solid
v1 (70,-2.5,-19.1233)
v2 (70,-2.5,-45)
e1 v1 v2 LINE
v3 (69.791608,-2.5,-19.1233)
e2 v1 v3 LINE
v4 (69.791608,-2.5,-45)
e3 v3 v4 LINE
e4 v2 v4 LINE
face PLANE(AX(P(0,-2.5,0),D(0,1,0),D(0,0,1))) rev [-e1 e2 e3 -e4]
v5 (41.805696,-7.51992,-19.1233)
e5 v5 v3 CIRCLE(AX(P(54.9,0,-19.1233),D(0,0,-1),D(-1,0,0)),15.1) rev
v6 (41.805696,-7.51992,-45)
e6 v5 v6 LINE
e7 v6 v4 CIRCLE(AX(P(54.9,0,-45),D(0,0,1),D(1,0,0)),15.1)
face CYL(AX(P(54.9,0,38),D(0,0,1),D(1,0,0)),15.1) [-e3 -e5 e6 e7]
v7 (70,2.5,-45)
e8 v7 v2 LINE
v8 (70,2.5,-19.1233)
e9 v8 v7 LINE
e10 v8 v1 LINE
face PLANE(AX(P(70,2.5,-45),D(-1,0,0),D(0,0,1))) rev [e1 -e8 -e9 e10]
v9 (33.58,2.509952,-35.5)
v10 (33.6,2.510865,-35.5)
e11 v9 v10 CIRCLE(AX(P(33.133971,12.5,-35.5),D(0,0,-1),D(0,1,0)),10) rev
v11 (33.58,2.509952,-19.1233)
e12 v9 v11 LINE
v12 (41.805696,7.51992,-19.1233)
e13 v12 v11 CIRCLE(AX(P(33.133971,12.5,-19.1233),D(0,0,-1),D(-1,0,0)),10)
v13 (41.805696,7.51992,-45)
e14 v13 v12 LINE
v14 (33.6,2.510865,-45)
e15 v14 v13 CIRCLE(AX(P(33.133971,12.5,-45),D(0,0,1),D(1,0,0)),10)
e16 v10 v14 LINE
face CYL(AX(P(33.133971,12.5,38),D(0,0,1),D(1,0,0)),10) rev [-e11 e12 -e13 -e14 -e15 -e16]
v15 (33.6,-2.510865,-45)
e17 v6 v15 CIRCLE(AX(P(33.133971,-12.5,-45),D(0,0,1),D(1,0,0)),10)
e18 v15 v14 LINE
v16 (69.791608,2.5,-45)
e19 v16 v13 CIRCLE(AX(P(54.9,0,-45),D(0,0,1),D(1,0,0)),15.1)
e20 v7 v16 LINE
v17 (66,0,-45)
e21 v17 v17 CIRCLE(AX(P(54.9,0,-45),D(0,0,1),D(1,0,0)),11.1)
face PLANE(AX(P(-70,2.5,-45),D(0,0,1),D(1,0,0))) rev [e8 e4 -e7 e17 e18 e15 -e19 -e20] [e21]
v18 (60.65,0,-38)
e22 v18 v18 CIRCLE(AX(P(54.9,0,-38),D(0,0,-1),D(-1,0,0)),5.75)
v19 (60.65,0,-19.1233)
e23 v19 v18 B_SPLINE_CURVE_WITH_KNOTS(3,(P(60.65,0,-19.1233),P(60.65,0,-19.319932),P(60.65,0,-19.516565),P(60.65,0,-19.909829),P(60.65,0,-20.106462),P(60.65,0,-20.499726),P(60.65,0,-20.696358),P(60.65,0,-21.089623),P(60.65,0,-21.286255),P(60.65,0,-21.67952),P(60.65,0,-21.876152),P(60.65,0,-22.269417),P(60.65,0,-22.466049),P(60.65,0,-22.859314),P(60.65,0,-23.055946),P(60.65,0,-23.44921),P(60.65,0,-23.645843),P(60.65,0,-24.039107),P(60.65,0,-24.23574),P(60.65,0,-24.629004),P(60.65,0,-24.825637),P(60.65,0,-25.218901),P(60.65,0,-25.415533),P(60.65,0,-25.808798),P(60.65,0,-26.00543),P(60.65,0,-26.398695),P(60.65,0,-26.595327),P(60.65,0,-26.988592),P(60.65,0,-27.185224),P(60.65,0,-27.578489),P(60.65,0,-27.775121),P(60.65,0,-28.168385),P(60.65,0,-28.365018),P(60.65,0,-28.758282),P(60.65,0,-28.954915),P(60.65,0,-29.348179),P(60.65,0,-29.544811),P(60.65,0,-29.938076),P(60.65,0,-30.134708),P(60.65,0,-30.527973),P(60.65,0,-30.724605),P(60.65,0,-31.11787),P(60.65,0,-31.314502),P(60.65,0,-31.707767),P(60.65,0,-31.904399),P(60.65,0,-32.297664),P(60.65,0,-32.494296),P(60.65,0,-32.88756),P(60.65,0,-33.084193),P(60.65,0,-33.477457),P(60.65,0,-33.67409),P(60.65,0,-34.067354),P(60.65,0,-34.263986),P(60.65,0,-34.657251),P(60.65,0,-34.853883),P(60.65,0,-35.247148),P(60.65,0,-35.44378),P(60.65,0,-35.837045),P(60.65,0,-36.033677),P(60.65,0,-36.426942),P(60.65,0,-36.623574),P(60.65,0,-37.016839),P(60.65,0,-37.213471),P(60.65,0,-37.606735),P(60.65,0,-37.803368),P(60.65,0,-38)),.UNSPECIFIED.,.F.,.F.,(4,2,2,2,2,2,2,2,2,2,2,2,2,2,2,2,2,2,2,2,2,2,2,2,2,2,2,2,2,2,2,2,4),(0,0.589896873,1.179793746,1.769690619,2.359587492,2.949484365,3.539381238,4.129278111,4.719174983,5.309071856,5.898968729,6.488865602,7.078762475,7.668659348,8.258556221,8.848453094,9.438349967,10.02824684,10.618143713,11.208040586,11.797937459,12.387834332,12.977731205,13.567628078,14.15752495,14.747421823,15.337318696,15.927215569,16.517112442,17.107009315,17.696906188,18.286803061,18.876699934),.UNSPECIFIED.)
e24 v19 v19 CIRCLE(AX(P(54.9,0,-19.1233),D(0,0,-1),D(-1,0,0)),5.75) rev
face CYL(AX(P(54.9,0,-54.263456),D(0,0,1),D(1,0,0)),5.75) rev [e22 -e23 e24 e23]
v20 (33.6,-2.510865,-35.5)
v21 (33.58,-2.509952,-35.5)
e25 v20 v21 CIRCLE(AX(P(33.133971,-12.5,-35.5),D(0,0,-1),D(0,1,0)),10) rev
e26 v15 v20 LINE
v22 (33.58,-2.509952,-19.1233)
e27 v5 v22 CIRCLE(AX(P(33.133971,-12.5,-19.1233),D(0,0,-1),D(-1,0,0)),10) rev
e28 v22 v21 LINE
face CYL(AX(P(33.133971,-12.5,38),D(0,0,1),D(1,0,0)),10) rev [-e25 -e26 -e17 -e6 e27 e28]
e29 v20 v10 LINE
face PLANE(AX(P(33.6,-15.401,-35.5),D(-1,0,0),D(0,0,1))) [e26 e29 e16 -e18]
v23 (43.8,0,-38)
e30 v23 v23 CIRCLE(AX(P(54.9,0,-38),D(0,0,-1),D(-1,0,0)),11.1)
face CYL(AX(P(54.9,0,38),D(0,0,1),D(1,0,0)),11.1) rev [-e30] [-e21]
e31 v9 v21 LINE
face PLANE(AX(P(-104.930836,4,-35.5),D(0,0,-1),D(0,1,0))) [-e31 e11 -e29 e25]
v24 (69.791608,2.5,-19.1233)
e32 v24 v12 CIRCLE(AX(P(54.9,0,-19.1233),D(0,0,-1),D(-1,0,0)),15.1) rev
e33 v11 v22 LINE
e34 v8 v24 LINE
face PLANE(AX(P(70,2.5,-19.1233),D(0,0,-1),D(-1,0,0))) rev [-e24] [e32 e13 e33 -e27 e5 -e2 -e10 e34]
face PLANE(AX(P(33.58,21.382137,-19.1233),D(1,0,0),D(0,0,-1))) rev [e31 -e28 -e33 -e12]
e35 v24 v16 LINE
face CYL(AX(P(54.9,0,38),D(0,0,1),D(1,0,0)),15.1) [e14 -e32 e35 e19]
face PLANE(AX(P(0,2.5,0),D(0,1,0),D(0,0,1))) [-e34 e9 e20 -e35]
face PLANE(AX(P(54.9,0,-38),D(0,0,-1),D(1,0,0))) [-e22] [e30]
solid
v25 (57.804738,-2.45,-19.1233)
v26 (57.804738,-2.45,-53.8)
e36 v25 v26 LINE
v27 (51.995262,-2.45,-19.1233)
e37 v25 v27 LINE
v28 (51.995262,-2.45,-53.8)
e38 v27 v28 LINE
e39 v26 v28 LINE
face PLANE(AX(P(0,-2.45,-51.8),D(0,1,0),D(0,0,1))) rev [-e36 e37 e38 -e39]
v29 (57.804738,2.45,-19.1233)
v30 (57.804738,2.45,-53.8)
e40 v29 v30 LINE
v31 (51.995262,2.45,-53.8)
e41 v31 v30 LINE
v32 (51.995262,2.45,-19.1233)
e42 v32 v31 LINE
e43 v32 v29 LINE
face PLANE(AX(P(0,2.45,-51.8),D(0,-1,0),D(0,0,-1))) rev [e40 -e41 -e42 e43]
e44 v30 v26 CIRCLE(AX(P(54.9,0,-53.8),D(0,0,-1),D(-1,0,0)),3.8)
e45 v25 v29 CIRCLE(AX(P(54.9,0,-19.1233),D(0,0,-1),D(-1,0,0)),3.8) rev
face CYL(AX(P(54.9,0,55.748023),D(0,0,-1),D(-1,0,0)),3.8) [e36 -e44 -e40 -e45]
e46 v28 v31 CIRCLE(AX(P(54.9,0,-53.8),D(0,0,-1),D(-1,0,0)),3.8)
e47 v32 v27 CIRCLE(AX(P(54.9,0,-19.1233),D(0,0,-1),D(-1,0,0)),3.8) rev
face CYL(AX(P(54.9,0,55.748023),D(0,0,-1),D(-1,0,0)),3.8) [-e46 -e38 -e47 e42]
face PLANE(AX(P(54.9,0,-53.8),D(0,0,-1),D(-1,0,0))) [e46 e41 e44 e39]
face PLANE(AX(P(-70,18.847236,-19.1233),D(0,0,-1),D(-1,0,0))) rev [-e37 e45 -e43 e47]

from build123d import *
from build123d.topology import SkipClean

# Parameters (mm, degrees)
SKETCH1_W                = 140
SKETCH1_H                = 90
BOSS_EXTRUDE1_DEPTH      = 2.5
SKETCH2_W                = 27.1
SKETCH2_H                = 30.8
SKETCH2_W_2              = 19.1
SKETCH2_H_2              = 22.8
BOSS_EXTRUDE2_DEPTH      = 40.6
SKETCH3_W                = 19.1
SKETCH3_H                = 22.8
BOSS_EXTRUDE3_DEPTH      = 4
CUT_EXTRUDE1_REACH       = 158.444
SKETCH4_W                = 5
SKETCH4_H                = 8
FILLET1_R                = 25
SKETCH5_W                = 38.1
SKETCH5_H                = 8
CUT_EXTRUDE2_DEPTH       = 39.6
CUT_EXTRUDE3_REACH       = 101.288
SKETCH6_W                = 55
SKETCH6_H                = 9.5
CUT_EXTRUDE4_REACH       = 135.898
SKETCH9_R                = 15.1
SKETCH9_R_2              = 11.1
BOSS_EXTRUDE4_DEPTH      = 7
SKETCH10_R               = 11.1
CUT_EXTRUDE5_DEPTH       = 7
SKETCH11_R               = 5.75
CUT_EXTRUDE6_DEPTH       = 76
BOSS_EXTRUDE5_DEPTH      = 76
SKETCH13_R               = 11.1
SKETCH13_R_2             = 5.75
BOSS_EXTRUDE6_DEPTH      = 76
SKETCH14_W               = 38.246600132
SKETCH14_H               = 12.6
CUT_EXTRUDE7_DEPTH       = 157.444143387
SKETCH15_R               = 3.8
BOSS_EXTRUDE7_DEPTH      = 90
SKETCH16_R               = 3.8
BOSS_EXTRUDE8_DEPTH      = 0.8
BOSS_EXTRUDE9_DEPTH      = 6
FILLET2_R                = 2
CHAMFER1_SIZE            = 1.6
FILLET3_R                = 10
FILLET4_R                = 5
CUT_EXTRUDE9_DEPTH       = 135.574774806
CUT_EXTRUDE10_DEPTH      = 157.444143476
CUT_EXTRUDE10_DEPTH_BACK = 157.444143476
SKETCH20_W               = 91.164780252
SKETCH20_H               = 36.856817744
CUT_EXTRUDE11_DEPTH      = 79.739570827
CUT_EXTRUDE11_DEPTH_BACK = 79.739570827
SKETCH21_W               = 114.516410758
SKETCH21_H               = 52.09205151
CUT_EXTRUDE12_DEPTH      = 6
BOSS_EXTRUDE10_DEPTH     = 8


# Read off the part's stored shape, not the designer's step: Mirror1
with BuildPart() as part:
    # Sketch1 → Boss-Extrude1 (new, symmetric)
    with BuildSketch(Plane(origin=(0, 0, 0), x_dir=(1, 0, 0), z_dir=(0, 1, 0))):
        Rectangle(SKETCH1_W, SKETCH1_H)
    extrude(amount=BOSS_EXTRUDE1_DEPTH, both=True)

    # Sketch2 → Boss-Extrude2 (add)
    with BuildSketch(Plane.ZY.offset(70)):
        with Locations((54.55, 0)):
            Rectangle(SKETCH2_W, SKETCH2_H)
        with Locations((54.55, 0)):
            Rectangle(SKETCH2_W_2, SKETCH2_H_2, mode=Mode.SUBTRACT)
    extrude(amount=-BOSS_EXTRUDE2_DEPTH)

    # Sketch3 → Boss-Extrude3 (add)
    with BuildSketch(Plane.ZY.offset(70)):
        with Locations((54.55, 0)):
            Rectangle(SKETCH3_W, SKETCH3_H)
    extrude(amount=-BOSS_EXTRUDE3_DEPTH)

    # Sketch4 → Cut-Extrude1 (cut, up to next)
    with BuildSketch(Plane.ZY.offset(70), mode=Mode.PRIVATE) as cut_extrude1_sk1:
        with Locations((54.55, 0)):
            Rectangle(SKETCH4_W, SKETCH4_H)
    cut_extrude1_tool1 = extrude(cut_extrude1_sk1.sketch, amount=-CUT_EXTRUDE1_REACH, mode=Mode.PRIVATE) & part.part
    add(cut_extrude1_tool1.solids().sort_by_distance((-70, 0, 54.55))[0], mode=Mode.SUBTRACT)

    # Fillet1
    # the kernel refuses this fillet: 25 mm, written as the material it adds along each edge
    with BuildSketch(Plane(origin=(-70, -2.5, 41), x_dir=(0, 0, -1), z_dir=(1, 0, 0))) as fillet1_piece_1:
        with BuildLine():
            CenterArc((21.876699934, -25), FILLET1_R, 90, 61.053024114)
            Line((0, -12.9), (-0.437533999, -12.658))
            ThreePointArc((-0.437533999, -12.658), (-0.5, -6.45), (-0.5, 0))
            Line((-0.5, 0), (0, 0.5))
            Line((0, 0.5), (21.876699934, 0.5))
            Line((21.876699934, 0.5), (21.876699934, 0))
        make_face()
    extrude(amount=40.6)
    with BuildSketch(Plane(origin=(-70, 2.5, 41), x_dir=(0, 0, -1), z_dir=(1, 0, 0))) as fillet1_piece_2:
        with BuildLine():
            CenterArc((21.876699934, 25), FILLET1_R, 208.946975886, 61.053024114)
            Line((0, 12.9), (-0.437533999, 12.658))
            ThreePointArc((-0.437533999, 12.658), (-0.5, 6.45), (-0.5, 0))
            Line((-0.5, 0), (0, -0.5))
            Line((0, -0.5), (21.876699934, -0.5))
            Line((21.876699934, -0.5), (21.876699934, 0))
        make_face()
    extrude(amount=40.6)

    # Sketch5 → Cut-Extrude2 (cut)
    with BuildSketch(Plane(origin=(-21.4, 0, 0), x_dir=(0, 0, -1), z_dir=(1, 0, 0))):
        with Locations((-54.55, 0)):
            Rectangle(SKETCH5_W, SKETCH5_H)
    extrude(amount=-CUT_EXTRUDE2_DEPTH, mode=Mode.SUBTRACT)

    # Sketch6 → Cut-Extrude3 (cut, up to next)
    with BuildSketch(Plane(origin=(0, 2.5, 0), x_dir=(1, 0, 0), z_dir=(0, 1, 0)), mode=Mode.PRIVATE) as cut_extrude3_sk1:
        with Locations((6.1, -40.25)):
            Rectangle(SKETCH6_W, SKETCH6_H)
    cut_extrude3_tool1 = extrude(cut_extrude3_sk1.sketch, amount=-CUT_EXTRUDE3_REACH, mode=Mode.PRIVATE) & part.part
    add(cut_extrude3_tool1.solids().sort_by_distance((6.1, 2.5, 40.25))[0], mode=Mode.SUBTRACT)

    # Sketch8 → Cut-Extrude4 (cut, up to next)
    with BuildSketch(Plane.XY.offset(68.1), mode=Mode.PRIVATE) as cut_extrude4_sk1:
        with BuildLine():
            Line((-58.5, 7.5), (-28.5, 7.5))
            ThreePointArc((-28.5, 7.5), (-21, 0), (-28.5, -7.5))
            Line((-28.5, -7.5), (-58.5, -7.5))
            ThreePointArc((-58.5, -7.5), (-66, 0), (-58.5, 7.5))
        make_face()
    cut_extrude4_tool1 = extrude(cut_extrude4_sk1.sketch, amount=-CUT_EXTRUDE4_REACH, mode=Mode.PRIVATE) & part.part
    add(cut_extrude4_tool1.solids().sort_by_distance((-43.5, 0, 68.1))[0], mode=Mode.SUBTRACT)

    # Mirror1
    split(bisect_by=Plane.XY, keep=Keep.TOP)

    # Mirror1 2: part across plane


with BuildPart() as part_1:
    add(part.part)
    add(part.part.mirror(Plane.XY))

    # Sketch9 → Boss-Extrude4 (add)
    with BuildSketch(Plane.XY.offset(45)):
        with Locations((54.9, 0)):
            Circle(SKETCH9_R)
        with Locations((54.9, 0)):
            Circle(SKETCH9_R_2, mode=Mode.SUBTRACT)
    boss_extrude4 = extrude(amount=-BOSS_EXTRUDE4_DEPTH)

    # Sketch10 → Cut-Extrude5 (cut)
    with BuildSketch(Plane.XY.offset(45)):
        with Locations((54.9, 0)):
            Circle(SKETCH10_R)
    cut_extrude5 = extrude(amount=-CUT_EXTRUDE5_DEPTH, mode=Mode.SUBTRACT)

    # Mirror2: Boss-Extrude4, Cut-Extrude5 across plane
    add(boss_extrude4.mirror(Plane.XY))
    add(cut_extrude5.mirror(Plane.XY), mode=Mode.SUBTRACT)

    # Sketch11 → Cut-Extrude6 (cut)
    with BuildSketch(Plane.XY.offset(38)):
        with Locations((54.9, 0)):
            Circle(SKETCH11_R)
    extrude(amount=-CUT_EXTRUDE6_DEPTH, mode=Mode.SUBTRACT)

    # Sketch12 → Boss-Extrude5 (add)
    with BuildSketch(Plane(origin=(0, 0, 38), x_dir=(-1, 0, 0), z_dir=(0, 0, -1))):
        with BuildLine():
            Line((-44.085195332, 2.5), (-40.008391625, 2.5))
            ThreePointArc((-40.008391625, 2.5), (-54.9, 15.1), (-69.791608375, 2.5))
            Line((-69.791608375, 2.5), (-65.714804668, 2.5))
            ThreePointArc((-65.714804668, 2.5), (-54.9, 11.1), (-44.085195332, 2.5))
        make_face()
        with BuildLine():
            Line((-40.008391625, -2.5), (-44.085195332, -2.5))
            ThreePointArc((-44.085195332, -2.5), (-54.9, -11.1), (-65.714804668, -2.5))
            Line((-65.714804668, -2.5), (-69.791608375, -2.5))
            ThreePointArc((-69.791608375, -2.5), (-54.9, -15.1), (-40.008391625, -2.5))
        make_face()
    extrude(amount=BOSS_EXTRUDE5_DEPTH)

    # Sketch13 → Boss-Extrude6 (add)
    with BuildSketch(Plane.XY.offset(38)):
        with Locations((54.9, 0)):
            Circle(SKETCH13_R)
        with Locations((54.9, 0)):
            Circle(SKETCH13_R_2, mode=Mode.SUBTRACT)
    extrude(amount=-BOSS_EXTRUDE6_DEPTH)

    # Sketch14 → Cut-Extrude7 (cut, through all)
    with BuildSketch(Plane.ZY.offset(70)):
        with Locations((0, 8.8)):
            Rectangle(SKETCH14_W, SKETCH14_H)
    extrude(amount=-CUT_EXTRUDE7_DEPTH, mode=Mode.SUBTRACT)

    # Fillet2
    fillet2_edges = [part_1.edges().sort_by_distance(p)[0] for p in [
        (-49.7, 15.4, -68.1),
        (-49.7, 15.4, -41),
        (-49.7, -15.4, -41),
        (-49.7, -15.4, -68.1),
        (-49.7, -15.4, 41),
        (-49.7, 15.4, 41),
        (-49.7, 15.4, 68.1),
        (-49.7, -15.4, 68.1),
    ]]
    fillet(fillet2_edges, radius=FILLET2_R)

    # Chamfer1
    chamfer1_edges = [part_1.edges().sort_by_distance(p)[0] for p in [
        (-43.95, 7.5, 68.1),
        (-66, 0, 68.1),
        (-43.95, -7.5, 68.1),
        (-43.95, 7.5, -68.1),
        (-43.95, -7.5, -68.1),
        (-66, 0, -68.1),
    ]]
    chamfer(chamfer1_edges, length=CHAMFER1_SIZE)

    # Fillet3
    # the kernel refuses this fillet: 10 mm, written as the material it adds along each edge
    with BuildSketch(Plane(origin=(40.008391625, -2.5, 38), x_dir=(0.3370807355447674, -0.9414757446289301, 0), z_dir=(0, 0, -1))) as fillet3_piece_1_section:
        with BuildLine():
            CenterArc((7.097522828, 9.842907234), FILLET3_R, 199.699116173, 60.131704489)
            Line((-2.317234618, 6.472099878), (0, 0))
            ThreePointArc((0, 0), (2.665984943, 0.237210077), (5.331969886, 0))
        make_face()
    fillet3_piece_1 = extrude(amount=76, mode=Mode.PRIVATE)
    fillet3_piece_1 = split(fillet3_piece_1, bisect_by=Plane(origin=(33.6, -3.612944969, 36.75), z_dir=(1, 0, 0)), keep=Keep.TOP, mode=Mode.PRIVATE)
    add(fillet3_piece_1)
    with BuildSketch(Plane(origin=(40.008391625, -2.5, 38), x_dir=(0.3370807355447674, -0.9414757446289301, 0), z_dir=(0, 0, -1))) as fillet3_piece_2_section:
        with BuildLine():
            CenterArc((7.097522828, 9.842907234), FILLET3_R, 199.699116173, 60.131704489)
            Line((-2.317234618, 6.472099878), (0, 0))
            ThreePointArc((0, 0), (2.665984943, 0.237210077), (5.331969886, 0))
        make_face()
    fillet3_piece_2 = extrude(amount=76, mode=Mode.PRIVATE)
    fillet3_piece_2 = split(fillet3_piece_2, bisect_by=Plane(origin=(33.483505518, -2.503259206, 35.5), z_dir=(0, 0, -1)), keep=Keep.TOP, mode=Mode.PRIVATE)
    fillet3_piece_2 = split(fillet3_piece_2, bisect_by=Plane(origin=(33.483505518, -2.503259206, -35.5), z_dir=(0, 0, 1)), keep=Keep.TOP, mode=Mode.PRIVATE)
    add(fillet3_piece_2)
    with BuildSketch(Plane(origin=(40.008391625, 2.5, -19.123300066), x_dir=(0.3370807355447668, 0.9414757446289305, 0), z_dir=(0, 0, -1))) as fillet3_piece_3_section:
        with BuildLine():
            CenterArc((7.097522828, -9.842907234), FILLET3_R, 100.169179339, 60.131704489)
            Line((-2.317234618, -6.472099878), (0, 0))
            ThreePointArc((0, 0), (2.665984943, -0.237210077), (5.331969886, 0))
        make_face()
    fillet3_piece_3 = extrude(amount=43.062750438, mode=Mode.PRIVATE)
    fillet3_piece_3 = split(fillet3_piece_3, bisect_by=Plane(origin=(38.74616156, 3.612944969, -35.5), z_dir=(0, 0, 1)), keep=Keep.TOP, mode=Mode.PRIVATE)
    add(fillet3_piece_3)
    with BuildSketch(Plane(origin=(40.008391625, 2.5, -19.123300066), x_dir=(0.3370807355447668, 0.9414757446289305, 0), z_dir=(0, 0, -1))) as fillet3_piece_4_section:
        with BuildLine():
            CenterArc((7.097522828, -9.842907234), FILLET3_R, 100.169179339, 60.131704489)
            Line((-2.317234618, -6.472099878), (0, 0))
            ThreePointArc((0, 0), (2.665984943, -0.237210077), (5.331969886, 0))
        make_face()
    fillet3_piece_4 = extrude(amount=25.876699934, mode=Mode.PRIVATE)
    fillet3_piece_4 = split(fillet3_piece_4, bisect_by=Plane(origin=(33.6, 3.612944969, -40.25), z_dir=(1, 0, 0)), keep=Keep.TOP, mode=Mode.PRIVATE)
    add(fillet3_piece_4)
    with BuildSketch(Plane(origin=(40.008391625, 2.5, 45), x_dir=(0.3370807355447668, 0.9414757446289305, 0), z_dir=(0, 0, -1))) as fillet3_piece_5_section:
        with BuildLine():
            CenterArc((7.097522828, -9.842907234), FILLET3_R, 100.169179339, 60.131704489)
            Line((-2.317234618, -6.472099878), (0, 0))
            ThreePointArc((0, 0), (2.665984943, -0.237210077), (5.331969886, 0))
        make_face()
    fillet3_piece_5 = extrude(amount=25.876699934, mode=Mode.PRIVATE)
    fillet3_piece_5 = split(fillet3_piece_5, bisect_by=Plane(origin=(33.6, 3.612944969, 40.25), z_dir=(1, 0, 0)), keep=Keep.TOP, mode=Mode.PRIVATE)
    add(fillet3_piece_5)
    with BuildSketch(Plane(origin=(40.008391625, 2.5, 62.186050504), x_dir=(0.3370807355447676, 0.9414757446289301, 0), z_dir=(0, 0, -1))) as fillet3_piece_6_section:
        with BuildLine():
            CenterArc((7.097522828, -9.842907234), FILLET3_R, 100.169179339, 60.131704489)
            Line((-2.317234618, -6.472099878), (0, 0))
            ThreePointArc((0, 0), (2.665984943, -0.237210077), (5.331969886, 0))
        make_face()
    fillet3_piece_6 = extrude(amount=43.062750438, mode=Mode.PRIVATE)
    fillet3_piece_6 = split(fillet3_piece_6, bisect_by=Plane(origin=(33.483505518, 2.503259206, 35.5), z_dir=(0, 0, -1)), keep=Keep.TOP, mode=Mode.PRIVATE)
    add(fillet3_piece_6)
    with BuildSketch(Plane(origin=(40.008391625, -2.5, 38), x_dir=(0.3370807355447675, -0.9414757446289301, 0), z_dir=(0, 0, 1))) as fillet3_piece_7_section:
        with BuildLine():
            CenterArc((7.097522828, -9.842907234), FILLET3_R, 100.169179339, 60.131704489)
            Line((-2.317234618, -6.472099878), (0, 0))
            ThreePointArc((0, 0), (2.665984943, -0.237210077), (5.331969886, 0))
        make_face()
    fillet3_piece_7 = extrude(amount=7, mode=Mode.PRIVATE)
    fillet3_piece_7 = split(fillet3_piece_7, bisect_by=Plane(origin=(33.6, -3.612944969, 41.5), z_dir=(1, 0, 0)), keep=Keep.TOP, mode=Mode.PRIVATE)
    add(fillet3_piece_7)
    with BuildSketch(Plane(origin=(40.008391625, -2.5, -38), x_dir=(0.3370807355447675, -0.9414757446289301, 0), z_dir=(0, 0, -1))) as fillet3_piece_8_section:
        with BuildLine():
            CenterArc((7.097522828, 9.842907234), FILLET3_R, 199.699116173, 60.131704489)
            Line((-2.317234618, 6.472099878), (0, 0))
            ThreePointArc((0, 0), (2.665984943, 0.237210077), (5.331969886, 0))
        make_face()
    fillet3_piece_8 = extrude(amount=7, mode=Mode.PRIVATE)
    fillet3_piece_8 = split(fillet3_piece_8, bisect_by=Plane(origin=(33.6, -3.612944969, -41.5), z_dir=(1, 0, 0)), keep=Keep.TOP, mode=Mode.PRIVATE)
    add(fillet3_piece_8)

    # Fillet4
    fillet4_edges = [part_1.edges().sort_by_distance(p)[0] for p in [
        (-29.4, -2.5, -27.311650033),
        (-29.4, 2.5, -27.311650033),
        (-29.4, 2.5, 27.311650033),
        (-29.4, -2.5, 27.311650033),
    ]]
    fillet(fillet4_edges, radius=FILLET4_R)


with BuildPart() as body_2:
    # Sketch15 → Boss-Extrude7 (new body)
    with BuildSketch(Plane(origin=(0, 0, -45), x_dir=(-1, 0, 0), z_dir=(0, 0, -1))):
        with Locations((-54.9, 0)):
            Circle(SKETCH15_R)
    extrude(amount=-BOSS_EXTRUDE7_DEPTH)

    # Sketch16 → Boss-Extrude8 (add)
    with BuildSketch(Plane(origin=(0, 0, -45), x_dir=(-1, 0, 0), z_dir=(0, 0, -1))):
        with Locations((-54.9, 0)):
            Circle(SKETCH16_R)
    boss_extrude8 = extrude(amount=BOSS_EXTRUDE8_DEPTH)

    # Sketch17 → Boss-Extrude9 (add)
    with BuildSketch(Plane(origin=(0, 0, -45.8), x_dir=(-1, 0, 0), z_dir=(0, 0, -1))):
        with BuildLine():
            Line((-57.672634127, -2.45), (-52.127365873, -2.45))
            ThreePointArc((-52.127365873, -2.45), (-51.2, 0), (-52.127365873, 2.45))
            Line((-52.127365873, 2.45), (-57.672634127, 2.45))
            ThreePointArc((-57.672634127, 2.45), (-58.6, 0), (-57.672634127, -2.45))
        make_face()
    boss_extrude9 = extrude(amount=BOSS_EXTRUDE9_DEPTH)

    # Mirror3: Boss-Extrude8, Boss-Extrude9 across plane
    add(boss_extrude8.mirror(Plane.XY))
    add(boss_extrude9.mirror(Plane.XY))

    # Sketch19 → Cut-Extrude9 (cut, through all)
    with BuildSketch(Plane(origin=(0, 0, -45.8), x_dir=(-1, 0, 0), z_dir=(0, 0, -1))):
        with BuildLine():
            Line((-52.127365873, 2.45), (-51.99526249, 2.45))
            ThreePointArc((-51.99526249, 2.45), (-54.9, 3.8), (-57.80473751, 2.45))
            Line((-57.80473751, 2.45), (-57.672634127, 2.45))
            Line((-57.672634127, 2.45), (-52.127365873, 2.45))
        make_face()
        with BuildLine():
            ThreePointArc((-57.80473751, -2.45), (-54.9, -3.8), (-51.99526249, -2.45))
            Line((-51.99526249, -2.45), (-52.127365873, -2.45))
            Line((-52.127365873, -2.45), (-57.672634127, -2.45))
            Line((-57.672634127, -2.45), (-57.80473751, -2.45))
        make_face()
    extrude(amount=-CUT_EXTRUDE9_DEPTH, mode=Mode.SUBTRACT)


with BuildPart() as cut_extrude10_tool:
    # Sketch20 → Cut-Extrude10 (new, two sides: drawn at the far end of the back side and taken through both)
    with BuildSketch(Plane(origin=(70, 0, 0), x_dir=(0, 0, -1), z_dir=(1, 0, 0)).offset(-CUT_EXTRUDE10_DEPTH_BACK)):
        with Locations((-26.45909006, 0.418827474)):
            Rectangle(SKETCH20_W, SKETCH20_H)
    extrude(amount=CUT_EXTRUDE10_DEPTH + CUT_EXTRUDE10_DEPTH_BACK)


with BuildPart() as part_2:
    add(part_1.part)

    # Cut-Extrude10: cut by cut_extrude10_tool
    add(cut_extrude10_tool.part, mode=Mode.SUBTRACT)

    # Sketch21 → Cut-Extrude11 (cut, two sides: drawn at the far end of the back side and taken through both)
    with BuildSketch(Plane(origin=(0, 0, -35.5), x_dir=(-1, 0, 0), z_dir=(0, 0, -1)).offset(-CUT_EXTRUDE11_DEPTH_BACK)):
        with Locations((23.678205232, -4.663888909)):
            Rectangle(SKETCH21_W, SKETCH21_H)
    extrude(amount=CUT_EXTRUDE11_DEPTH + CUT_EXTRUDE11_DEPTH_BACK, mode=Mode.SUBTRACT)


with BuildPart() as body_2_1:
    add(body_2.part)

    # Cut-Extrude10: cut by cut_extrude10_tool
    add(cut_extrude10_tool.part, mode=Mode.SUBTRACT)

    # Sketch22 → Cut-Extrude12 (cut)
    with BuildSketch(Plane(origin=(0, 0, -51.8), x_dir=(-1, 0, 0), z_dir=(0, 0, -1))):
        with BuildLine():
            Line((-57.672634127, -2.45), (-52.127365873, -2.45))
            ThreePointArc((-52.127365873, -2.45), (-51.2, 0), (-52.127365873, 2.45))
            Line((-52.127365873, 2.45), (-57.672634127, 2.45))
            ThreePointArc((-57.672634127, 2.45), (-58.6, 0), (-57.672634127, -2.45))
        make_face()
    extrude(amount=-CUT_EXTRUDE12_DEPTH, mode=Mode.SUBTRACT)

    # Sketch23 → Boss-Extrude10 (add)
    with SkipClean():  # the faces are left unmerged after this step: merging them gives an invalid solid
        with BuildSketch(Plane(origin=(0, 0, -45.8), x_dir=(-1, 0, 0), z_dir=(0, 0, -1))):
            with BuildLine():
                Line((-57.80473751, -2.45), (-51.99526249, -2.45))
                ThreePointArc((-51.99526249, -2.45), (-51.1, 0), (-51.99526249, 2.45))
                Line((-51.99526249, 2.45), (-57.80473751, 2.45))
                ThreePointArc((-57.80473751, 2.45), (-58.7, 0), (-57.80473751, -2.45))
            make_face()
        extrude(amount=BOSS_EXTRUDE10_DEPTH)


solid = Compound([part_2.part, body_2_1.part])
